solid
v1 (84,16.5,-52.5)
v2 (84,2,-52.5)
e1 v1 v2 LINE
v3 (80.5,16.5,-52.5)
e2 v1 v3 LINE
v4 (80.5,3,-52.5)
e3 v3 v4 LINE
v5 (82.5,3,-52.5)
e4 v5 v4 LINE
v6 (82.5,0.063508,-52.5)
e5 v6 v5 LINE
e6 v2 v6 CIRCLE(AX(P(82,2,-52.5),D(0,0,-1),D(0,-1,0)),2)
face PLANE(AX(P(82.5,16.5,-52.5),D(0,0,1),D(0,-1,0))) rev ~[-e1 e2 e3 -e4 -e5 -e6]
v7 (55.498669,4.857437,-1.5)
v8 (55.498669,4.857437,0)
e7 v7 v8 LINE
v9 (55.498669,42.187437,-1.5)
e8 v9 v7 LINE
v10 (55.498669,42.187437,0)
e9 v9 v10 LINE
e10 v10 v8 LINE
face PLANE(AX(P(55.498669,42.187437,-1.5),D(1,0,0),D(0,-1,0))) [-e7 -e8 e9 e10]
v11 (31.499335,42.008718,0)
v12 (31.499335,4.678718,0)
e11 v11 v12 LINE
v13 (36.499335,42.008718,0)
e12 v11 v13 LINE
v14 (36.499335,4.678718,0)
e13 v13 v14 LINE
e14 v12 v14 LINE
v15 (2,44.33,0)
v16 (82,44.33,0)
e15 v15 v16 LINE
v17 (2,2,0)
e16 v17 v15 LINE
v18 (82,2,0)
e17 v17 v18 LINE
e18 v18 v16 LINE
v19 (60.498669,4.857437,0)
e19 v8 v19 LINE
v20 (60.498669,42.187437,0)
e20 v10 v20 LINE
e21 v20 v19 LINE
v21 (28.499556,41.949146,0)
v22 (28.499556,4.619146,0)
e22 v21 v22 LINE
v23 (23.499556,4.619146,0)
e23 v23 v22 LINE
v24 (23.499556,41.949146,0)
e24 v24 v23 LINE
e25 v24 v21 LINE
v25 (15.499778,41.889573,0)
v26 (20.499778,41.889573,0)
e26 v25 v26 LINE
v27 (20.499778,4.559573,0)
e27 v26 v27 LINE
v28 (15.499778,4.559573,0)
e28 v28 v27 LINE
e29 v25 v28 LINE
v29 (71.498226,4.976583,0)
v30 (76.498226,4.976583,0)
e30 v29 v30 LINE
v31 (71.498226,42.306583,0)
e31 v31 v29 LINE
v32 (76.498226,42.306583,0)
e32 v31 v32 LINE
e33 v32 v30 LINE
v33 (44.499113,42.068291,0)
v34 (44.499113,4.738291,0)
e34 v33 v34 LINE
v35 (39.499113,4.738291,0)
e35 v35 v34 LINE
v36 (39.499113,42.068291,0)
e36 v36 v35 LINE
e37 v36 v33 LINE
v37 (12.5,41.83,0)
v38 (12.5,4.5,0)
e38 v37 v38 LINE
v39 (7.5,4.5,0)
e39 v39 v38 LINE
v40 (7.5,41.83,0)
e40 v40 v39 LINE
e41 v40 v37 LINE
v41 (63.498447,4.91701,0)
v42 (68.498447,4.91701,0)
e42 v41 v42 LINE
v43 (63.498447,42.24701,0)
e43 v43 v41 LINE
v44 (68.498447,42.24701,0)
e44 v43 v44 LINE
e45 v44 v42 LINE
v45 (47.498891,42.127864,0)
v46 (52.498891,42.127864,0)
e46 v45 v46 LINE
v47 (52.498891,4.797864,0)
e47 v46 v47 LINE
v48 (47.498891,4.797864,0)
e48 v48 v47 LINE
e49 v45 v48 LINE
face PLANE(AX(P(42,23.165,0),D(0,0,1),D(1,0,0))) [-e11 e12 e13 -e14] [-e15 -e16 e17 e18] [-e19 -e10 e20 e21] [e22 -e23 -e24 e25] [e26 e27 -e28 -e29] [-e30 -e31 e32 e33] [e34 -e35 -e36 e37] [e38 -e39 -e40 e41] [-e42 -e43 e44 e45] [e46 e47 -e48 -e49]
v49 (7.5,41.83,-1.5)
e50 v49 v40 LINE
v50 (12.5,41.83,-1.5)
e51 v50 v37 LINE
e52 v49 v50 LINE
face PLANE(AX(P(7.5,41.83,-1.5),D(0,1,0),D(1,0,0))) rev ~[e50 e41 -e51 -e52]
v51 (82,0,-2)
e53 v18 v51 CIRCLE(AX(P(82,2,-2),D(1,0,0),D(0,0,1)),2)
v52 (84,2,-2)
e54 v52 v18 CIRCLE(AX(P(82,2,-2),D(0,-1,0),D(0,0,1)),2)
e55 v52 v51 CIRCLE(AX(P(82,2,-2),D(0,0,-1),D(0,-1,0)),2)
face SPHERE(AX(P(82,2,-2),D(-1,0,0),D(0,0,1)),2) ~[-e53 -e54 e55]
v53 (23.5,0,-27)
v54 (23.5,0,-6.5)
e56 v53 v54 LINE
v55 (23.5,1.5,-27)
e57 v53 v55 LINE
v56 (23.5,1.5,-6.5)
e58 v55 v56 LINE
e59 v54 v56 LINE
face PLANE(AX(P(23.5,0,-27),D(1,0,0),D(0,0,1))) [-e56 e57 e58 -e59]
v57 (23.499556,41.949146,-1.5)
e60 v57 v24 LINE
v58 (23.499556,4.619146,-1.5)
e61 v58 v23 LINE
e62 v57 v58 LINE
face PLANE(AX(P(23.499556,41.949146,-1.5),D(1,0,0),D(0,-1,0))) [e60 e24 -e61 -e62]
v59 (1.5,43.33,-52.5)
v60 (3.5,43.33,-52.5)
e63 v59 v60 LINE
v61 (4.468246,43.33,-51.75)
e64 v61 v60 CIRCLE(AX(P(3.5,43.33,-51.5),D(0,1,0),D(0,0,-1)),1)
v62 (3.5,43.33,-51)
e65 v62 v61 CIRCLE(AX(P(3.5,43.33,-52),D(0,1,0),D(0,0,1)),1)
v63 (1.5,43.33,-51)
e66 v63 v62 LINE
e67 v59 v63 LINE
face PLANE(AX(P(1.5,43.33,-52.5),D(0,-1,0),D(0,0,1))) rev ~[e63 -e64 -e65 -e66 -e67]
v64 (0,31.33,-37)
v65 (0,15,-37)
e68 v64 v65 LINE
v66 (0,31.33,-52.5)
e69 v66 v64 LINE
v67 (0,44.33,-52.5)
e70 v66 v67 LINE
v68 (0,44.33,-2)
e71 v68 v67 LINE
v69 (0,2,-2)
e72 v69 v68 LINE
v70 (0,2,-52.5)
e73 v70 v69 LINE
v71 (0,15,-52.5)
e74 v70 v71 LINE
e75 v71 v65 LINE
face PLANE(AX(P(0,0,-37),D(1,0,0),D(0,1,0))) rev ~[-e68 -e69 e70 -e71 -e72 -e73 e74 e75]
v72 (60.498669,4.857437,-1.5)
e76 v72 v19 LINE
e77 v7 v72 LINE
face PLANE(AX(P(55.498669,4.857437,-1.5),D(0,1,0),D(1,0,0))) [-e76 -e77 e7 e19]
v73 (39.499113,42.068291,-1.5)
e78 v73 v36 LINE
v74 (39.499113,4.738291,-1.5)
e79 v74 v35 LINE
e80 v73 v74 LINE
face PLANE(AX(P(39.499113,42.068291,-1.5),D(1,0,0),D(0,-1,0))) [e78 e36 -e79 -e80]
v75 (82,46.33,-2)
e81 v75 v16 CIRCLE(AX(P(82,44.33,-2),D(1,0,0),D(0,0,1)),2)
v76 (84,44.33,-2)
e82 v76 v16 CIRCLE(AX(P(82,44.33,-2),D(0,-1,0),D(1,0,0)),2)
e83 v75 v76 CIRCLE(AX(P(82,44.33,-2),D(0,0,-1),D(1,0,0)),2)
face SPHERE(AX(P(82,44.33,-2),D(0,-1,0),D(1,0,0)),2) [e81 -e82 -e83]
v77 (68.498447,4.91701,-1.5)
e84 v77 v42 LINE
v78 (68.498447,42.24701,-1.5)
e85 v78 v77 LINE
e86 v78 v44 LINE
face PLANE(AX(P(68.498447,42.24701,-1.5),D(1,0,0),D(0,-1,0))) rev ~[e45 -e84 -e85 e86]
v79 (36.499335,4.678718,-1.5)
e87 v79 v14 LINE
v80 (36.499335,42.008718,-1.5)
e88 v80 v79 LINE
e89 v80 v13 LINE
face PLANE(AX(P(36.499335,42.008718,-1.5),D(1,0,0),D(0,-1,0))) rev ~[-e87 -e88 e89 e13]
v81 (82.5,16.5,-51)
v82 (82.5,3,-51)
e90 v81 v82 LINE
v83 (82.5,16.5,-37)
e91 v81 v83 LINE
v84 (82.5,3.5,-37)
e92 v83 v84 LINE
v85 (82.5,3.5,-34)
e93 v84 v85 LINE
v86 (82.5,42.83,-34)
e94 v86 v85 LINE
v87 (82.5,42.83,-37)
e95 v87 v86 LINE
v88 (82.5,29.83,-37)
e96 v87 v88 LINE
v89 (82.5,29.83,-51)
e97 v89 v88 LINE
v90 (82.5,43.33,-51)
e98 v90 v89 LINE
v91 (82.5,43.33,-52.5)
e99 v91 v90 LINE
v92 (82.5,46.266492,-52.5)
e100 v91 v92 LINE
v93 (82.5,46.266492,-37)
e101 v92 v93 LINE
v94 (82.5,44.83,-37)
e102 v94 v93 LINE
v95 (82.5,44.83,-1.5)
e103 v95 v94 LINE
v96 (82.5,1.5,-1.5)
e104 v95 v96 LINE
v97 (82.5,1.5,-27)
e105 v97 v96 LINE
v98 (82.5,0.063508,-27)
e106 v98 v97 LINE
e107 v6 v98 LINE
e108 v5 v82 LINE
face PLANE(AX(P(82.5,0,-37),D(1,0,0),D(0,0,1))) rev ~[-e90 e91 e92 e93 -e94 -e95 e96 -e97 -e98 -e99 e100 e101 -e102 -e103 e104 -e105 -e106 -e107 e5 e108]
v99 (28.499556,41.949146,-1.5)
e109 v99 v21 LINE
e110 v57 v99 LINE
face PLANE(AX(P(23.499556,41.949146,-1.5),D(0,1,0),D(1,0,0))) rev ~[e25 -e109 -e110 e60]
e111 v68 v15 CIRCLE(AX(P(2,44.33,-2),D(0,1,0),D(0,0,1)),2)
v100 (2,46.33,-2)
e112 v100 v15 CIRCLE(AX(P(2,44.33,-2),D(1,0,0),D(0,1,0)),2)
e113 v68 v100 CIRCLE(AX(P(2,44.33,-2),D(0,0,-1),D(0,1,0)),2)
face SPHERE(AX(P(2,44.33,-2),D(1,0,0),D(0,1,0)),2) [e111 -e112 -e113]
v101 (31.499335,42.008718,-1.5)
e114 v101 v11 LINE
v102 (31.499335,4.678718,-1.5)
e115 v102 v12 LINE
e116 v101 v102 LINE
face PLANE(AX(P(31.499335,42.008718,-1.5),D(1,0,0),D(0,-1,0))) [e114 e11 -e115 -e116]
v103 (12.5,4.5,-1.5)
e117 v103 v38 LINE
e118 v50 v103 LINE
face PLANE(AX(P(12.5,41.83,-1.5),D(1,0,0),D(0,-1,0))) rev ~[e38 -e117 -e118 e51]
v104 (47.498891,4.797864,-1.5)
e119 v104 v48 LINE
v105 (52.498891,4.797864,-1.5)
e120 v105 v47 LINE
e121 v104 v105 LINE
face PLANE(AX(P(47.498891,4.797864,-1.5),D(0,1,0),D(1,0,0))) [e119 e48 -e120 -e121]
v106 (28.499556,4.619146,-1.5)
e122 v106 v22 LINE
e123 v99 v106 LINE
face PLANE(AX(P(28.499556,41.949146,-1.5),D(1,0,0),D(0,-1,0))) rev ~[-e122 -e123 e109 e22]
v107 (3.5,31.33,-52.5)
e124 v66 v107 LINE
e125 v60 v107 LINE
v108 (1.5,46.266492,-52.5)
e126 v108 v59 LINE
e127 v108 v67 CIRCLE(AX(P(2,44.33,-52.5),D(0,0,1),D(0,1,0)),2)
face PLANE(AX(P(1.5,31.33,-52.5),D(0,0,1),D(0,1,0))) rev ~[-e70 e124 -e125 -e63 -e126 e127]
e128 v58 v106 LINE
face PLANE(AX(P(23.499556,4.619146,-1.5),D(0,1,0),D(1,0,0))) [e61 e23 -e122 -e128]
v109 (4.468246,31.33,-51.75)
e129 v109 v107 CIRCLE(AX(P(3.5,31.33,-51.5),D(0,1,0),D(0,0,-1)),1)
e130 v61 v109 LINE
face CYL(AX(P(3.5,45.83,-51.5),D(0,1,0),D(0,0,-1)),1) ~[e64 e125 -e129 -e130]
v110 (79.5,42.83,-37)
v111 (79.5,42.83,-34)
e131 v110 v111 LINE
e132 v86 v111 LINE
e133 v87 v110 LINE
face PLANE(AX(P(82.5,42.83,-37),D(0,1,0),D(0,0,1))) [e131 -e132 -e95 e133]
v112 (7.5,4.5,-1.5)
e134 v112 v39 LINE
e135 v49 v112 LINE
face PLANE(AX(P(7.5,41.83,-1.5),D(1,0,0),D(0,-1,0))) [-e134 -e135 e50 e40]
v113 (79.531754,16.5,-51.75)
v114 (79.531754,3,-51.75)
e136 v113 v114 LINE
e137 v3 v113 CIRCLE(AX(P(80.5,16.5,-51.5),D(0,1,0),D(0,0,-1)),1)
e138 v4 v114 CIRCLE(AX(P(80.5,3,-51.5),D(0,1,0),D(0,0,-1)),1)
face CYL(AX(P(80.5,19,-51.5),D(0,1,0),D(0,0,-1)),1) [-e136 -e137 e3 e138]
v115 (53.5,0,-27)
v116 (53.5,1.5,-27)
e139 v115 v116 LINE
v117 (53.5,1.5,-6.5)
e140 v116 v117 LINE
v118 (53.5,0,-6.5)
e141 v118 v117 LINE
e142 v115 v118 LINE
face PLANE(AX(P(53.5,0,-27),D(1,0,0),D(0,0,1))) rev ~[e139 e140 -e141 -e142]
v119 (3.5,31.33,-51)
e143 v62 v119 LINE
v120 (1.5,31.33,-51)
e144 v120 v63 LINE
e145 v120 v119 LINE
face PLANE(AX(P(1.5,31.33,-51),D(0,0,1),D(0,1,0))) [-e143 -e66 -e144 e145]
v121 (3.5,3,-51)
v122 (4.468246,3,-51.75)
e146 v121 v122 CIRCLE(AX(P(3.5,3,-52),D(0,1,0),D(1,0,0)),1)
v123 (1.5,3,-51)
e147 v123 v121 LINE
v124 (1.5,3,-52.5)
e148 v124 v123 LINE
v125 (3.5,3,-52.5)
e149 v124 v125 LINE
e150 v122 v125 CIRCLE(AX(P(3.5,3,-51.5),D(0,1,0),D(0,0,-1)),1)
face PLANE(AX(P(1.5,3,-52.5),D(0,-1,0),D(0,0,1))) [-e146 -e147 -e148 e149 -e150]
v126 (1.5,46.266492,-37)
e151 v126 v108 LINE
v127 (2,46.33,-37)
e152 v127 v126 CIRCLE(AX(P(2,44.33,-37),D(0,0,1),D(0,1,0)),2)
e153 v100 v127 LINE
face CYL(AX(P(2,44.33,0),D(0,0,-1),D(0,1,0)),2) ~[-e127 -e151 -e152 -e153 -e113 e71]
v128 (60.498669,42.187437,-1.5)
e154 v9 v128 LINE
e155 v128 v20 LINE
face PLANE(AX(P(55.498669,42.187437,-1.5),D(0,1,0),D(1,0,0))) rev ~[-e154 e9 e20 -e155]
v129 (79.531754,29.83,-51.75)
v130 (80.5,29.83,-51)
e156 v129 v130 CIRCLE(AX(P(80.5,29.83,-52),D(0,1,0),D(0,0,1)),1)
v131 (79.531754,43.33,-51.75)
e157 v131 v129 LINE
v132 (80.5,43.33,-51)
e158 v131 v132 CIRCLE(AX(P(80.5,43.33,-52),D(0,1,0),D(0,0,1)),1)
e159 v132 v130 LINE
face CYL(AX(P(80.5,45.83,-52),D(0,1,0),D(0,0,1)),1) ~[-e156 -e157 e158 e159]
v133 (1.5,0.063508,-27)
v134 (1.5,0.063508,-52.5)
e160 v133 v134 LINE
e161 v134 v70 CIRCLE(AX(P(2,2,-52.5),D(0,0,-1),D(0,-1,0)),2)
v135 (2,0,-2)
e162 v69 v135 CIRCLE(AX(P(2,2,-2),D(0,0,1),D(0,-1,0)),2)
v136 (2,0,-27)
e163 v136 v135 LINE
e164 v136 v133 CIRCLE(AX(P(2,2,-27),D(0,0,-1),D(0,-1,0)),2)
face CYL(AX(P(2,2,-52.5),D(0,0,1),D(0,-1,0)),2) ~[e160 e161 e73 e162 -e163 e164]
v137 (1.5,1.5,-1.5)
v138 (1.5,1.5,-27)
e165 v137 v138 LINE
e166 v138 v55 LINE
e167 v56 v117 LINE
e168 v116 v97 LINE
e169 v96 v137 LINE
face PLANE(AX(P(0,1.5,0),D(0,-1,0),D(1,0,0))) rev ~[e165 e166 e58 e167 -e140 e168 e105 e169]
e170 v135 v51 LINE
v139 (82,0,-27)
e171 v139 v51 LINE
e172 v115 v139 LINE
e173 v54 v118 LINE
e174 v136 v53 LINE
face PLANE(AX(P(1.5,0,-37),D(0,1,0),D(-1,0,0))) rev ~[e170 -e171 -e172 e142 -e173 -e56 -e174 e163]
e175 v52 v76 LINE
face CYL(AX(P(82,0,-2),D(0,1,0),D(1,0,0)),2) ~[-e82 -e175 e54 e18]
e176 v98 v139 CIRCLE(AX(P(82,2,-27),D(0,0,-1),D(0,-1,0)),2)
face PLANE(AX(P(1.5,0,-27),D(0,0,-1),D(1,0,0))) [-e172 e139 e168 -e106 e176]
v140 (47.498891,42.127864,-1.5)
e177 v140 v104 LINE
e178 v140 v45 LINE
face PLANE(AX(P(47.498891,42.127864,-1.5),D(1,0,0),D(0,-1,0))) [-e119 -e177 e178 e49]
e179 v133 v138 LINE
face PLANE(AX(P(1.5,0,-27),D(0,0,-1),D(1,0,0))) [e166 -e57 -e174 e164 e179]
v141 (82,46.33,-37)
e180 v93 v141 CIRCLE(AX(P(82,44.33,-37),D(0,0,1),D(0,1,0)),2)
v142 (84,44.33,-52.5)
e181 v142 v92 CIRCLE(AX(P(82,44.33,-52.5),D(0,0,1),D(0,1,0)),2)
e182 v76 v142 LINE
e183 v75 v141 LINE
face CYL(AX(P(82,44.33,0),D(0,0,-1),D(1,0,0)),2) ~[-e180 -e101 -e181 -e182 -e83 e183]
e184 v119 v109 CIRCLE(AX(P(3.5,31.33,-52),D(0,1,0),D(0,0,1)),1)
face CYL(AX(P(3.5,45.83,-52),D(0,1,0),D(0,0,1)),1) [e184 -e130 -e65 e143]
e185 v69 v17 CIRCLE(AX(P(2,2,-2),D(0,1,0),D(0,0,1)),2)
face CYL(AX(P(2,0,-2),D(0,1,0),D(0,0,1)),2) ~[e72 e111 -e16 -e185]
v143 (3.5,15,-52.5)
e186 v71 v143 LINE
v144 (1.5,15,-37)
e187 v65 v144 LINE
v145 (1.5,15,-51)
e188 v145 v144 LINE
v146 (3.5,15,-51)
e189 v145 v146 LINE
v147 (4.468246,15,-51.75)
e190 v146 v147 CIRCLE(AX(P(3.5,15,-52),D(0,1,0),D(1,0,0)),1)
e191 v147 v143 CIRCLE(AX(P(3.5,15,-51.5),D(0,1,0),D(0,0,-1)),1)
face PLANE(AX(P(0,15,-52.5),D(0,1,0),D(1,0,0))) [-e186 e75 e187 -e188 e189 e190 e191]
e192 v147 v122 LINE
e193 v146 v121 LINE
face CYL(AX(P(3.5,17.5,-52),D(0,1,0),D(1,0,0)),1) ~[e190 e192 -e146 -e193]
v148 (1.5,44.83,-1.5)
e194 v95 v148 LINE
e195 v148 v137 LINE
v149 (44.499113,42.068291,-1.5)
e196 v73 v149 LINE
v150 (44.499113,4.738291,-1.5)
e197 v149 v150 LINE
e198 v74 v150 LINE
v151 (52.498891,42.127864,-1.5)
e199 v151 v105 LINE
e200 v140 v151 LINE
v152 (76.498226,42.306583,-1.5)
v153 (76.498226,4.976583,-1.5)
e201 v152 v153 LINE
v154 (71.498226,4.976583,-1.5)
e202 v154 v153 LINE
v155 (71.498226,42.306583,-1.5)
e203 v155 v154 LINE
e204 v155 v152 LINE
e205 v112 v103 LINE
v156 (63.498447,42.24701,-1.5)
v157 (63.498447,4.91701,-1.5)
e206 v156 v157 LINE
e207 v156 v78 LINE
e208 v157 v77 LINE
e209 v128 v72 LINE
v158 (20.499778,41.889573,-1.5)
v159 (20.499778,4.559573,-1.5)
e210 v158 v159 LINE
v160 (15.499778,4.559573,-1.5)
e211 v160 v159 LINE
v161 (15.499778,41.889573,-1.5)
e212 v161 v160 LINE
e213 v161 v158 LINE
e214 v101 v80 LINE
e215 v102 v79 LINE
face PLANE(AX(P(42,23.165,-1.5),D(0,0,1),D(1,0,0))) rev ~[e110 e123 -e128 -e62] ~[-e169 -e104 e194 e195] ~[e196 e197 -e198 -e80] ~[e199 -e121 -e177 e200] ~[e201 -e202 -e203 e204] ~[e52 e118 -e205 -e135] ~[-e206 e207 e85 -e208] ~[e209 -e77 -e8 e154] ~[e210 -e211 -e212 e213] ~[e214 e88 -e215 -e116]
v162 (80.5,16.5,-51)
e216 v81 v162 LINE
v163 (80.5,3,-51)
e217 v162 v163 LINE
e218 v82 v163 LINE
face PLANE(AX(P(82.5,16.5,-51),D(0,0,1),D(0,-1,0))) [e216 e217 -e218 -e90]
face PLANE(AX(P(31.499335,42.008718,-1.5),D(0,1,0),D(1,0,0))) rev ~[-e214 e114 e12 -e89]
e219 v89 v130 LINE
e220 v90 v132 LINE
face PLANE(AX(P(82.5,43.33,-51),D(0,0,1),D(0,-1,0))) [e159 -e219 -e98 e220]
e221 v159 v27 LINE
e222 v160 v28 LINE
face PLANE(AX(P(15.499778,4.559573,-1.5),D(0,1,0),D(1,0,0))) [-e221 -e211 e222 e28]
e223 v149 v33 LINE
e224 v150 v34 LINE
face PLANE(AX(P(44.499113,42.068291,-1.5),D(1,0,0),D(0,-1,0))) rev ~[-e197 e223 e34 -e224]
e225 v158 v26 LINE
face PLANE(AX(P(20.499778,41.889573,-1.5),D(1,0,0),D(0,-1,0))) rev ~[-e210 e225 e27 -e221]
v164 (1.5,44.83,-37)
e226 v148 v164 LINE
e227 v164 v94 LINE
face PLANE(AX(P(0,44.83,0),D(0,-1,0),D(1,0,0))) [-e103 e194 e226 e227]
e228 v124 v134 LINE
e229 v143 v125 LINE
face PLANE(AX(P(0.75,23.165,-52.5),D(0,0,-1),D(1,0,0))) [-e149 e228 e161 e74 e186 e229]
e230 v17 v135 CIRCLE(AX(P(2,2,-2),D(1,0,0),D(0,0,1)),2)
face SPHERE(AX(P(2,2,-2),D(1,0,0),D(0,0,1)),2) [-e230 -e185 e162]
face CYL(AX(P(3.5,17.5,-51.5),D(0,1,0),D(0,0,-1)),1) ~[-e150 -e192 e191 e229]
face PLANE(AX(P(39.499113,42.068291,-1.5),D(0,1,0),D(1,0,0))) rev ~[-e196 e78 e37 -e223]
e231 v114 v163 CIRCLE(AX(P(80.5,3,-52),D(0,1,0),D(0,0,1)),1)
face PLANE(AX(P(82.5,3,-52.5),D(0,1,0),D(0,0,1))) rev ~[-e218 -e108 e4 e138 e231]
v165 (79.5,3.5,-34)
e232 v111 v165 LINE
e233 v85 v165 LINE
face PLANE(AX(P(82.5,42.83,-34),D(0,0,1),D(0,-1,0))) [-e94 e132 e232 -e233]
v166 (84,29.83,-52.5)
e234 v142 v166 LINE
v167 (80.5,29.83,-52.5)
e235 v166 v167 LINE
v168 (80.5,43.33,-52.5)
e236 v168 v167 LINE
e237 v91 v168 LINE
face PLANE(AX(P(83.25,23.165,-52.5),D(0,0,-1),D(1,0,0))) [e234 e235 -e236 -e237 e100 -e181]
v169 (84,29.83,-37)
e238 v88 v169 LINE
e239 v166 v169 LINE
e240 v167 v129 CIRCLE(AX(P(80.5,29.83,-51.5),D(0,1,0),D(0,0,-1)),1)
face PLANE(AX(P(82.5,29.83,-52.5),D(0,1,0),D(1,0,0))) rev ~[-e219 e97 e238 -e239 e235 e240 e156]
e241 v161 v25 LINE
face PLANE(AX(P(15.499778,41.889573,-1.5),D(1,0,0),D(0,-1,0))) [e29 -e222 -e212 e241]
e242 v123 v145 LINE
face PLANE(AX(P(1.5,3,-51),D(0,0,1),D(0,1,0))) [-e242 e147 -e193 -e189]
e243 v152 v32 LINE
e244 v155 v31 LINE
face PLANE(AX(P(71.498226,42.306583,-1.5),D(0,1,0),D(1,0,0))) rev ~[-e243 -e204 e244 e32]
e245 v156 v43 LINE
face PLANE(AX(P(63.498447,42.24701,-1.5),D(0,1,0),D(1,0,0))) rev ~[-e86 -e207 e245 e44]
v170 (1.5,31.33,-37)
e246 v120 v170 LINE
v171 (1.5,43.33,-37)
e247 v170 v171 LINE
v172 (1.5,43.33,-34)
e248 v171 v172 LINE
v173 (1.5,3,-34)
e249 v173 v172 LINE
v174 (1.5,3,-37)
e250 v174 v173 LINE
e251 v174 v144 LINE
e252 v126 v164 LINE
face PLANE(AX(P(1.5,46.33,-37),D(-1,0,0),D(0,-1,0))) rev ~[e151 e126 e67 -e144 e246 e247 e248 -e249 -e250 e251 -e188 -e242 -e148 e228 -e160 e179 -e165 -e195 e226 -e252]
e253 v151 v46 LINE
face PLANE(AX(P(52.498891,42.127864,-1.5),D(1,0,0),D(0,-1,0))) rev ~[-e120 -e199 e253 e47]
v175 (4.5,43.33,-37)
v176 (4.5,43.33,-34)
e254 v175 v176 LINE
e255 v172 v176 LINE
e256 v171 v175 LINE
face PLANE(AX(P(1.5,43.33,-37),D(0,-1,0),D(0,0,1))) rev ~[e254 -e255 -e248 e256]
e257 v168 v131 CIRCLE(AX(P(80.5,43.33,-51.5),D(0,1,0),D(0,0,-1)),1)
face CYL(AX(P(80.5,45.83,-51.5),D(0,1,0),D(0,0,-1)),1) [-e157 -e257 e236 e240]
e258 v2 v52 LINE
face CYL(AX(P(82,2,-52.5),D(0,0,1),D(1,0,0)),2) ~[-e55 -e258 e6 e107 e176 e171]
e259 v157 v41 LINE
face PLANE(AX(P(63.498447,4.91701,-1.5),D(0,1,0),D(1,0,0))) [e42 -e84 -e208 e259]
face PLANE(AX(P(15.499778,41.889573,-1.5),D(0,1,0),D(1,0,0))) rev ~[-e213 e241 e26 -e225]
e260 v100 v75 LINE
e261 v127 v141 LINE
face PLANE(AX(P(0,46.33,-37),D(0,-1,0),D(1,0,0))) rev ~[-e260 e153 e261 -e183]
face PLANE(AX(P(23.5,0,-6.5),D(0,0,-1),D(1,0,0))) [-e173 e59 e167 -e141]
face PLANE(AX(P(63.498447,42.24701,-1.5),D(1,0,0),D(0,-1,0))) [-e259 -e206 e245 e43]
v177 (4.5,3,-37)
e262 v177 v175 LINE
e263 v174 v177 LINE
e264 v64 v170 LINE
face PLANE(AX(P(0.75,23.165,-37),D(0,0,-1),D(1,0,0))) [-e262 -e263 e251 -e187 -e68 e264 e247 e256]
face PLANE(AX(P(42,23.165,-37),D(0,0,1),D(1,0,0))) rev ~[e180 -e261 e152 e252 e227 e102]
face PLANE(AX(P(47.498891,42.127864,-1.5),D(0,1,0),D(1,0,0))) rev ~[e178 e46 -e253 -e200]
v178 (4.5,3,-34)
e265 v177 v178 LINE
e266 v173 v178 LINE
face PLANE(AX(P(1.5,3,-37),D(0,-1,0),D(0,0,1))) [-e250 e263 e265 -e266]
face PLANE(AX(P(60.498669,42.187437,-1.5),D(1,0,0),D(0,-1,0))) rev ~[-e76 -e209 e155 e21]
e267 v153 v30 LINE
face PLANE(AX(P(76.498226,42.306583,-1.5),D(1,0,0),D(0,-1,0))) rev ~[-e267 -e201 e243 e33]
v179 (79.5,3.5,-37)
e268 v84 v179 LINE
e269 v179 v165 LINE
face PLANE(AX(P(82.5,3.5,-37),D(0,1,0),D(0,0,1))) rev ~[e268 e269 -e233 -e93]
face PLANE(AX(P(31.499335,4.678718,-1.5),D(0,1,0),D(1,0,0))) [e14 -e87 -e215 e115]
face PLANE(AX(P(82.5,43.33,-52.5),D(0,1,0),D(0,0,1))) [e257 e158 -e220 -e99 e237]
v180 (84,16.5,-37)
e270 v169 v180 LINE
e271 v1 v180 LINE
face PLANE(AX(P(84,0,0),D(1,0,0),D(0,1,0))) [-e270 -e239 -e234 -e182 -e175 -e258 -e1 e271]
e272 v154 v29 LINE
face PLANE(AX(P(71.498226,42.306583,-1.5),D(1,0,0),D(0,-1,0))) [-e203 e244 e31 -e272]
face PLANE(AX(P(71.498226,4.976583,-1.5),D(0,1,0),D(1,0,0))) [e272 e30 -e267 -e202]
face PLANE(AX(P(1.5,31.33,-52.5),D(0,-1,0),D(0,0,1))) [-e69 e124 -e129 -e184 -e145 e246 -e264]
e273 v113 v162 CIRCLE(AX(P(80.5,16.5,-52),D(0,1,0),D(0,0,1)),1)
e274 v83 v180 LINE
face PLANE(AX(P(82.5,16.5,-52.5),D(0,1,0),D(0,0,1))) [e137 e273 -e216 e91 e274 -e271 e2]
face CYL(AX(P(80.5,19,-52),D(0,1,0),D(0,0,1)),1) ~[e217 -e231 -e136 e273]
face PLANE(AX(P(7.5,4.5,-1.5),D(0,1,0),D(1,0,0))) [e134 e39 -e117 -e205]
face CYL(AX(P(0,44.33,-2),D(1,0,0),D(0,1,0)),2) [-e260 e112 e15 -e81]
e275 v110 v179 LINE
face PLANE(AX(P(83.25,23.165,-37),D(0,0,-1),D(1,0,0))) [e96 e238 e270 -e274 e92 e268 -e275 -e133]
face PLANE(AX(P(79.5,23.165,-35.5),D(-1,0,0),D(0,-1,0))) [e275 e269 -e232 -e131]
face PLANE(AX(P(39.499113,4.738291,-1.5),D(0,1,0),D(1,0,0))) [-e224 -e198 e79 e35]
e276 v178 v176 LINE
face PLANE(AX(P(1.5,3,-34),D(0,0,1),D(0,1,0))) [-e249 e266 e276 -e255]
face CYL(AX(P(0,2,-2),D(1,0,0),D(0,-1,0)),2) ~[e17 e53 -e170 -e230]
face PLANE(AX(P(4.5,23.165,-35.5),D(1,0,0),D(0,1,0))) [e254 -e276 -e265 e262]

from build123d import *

# Parameters (mm, degrees)
F0_W         = 84
F0_H         = 46.33
F1_DEPTH     = 37
F2_T         = -1.5
F4_W         = 81
F4_H         = 10
F5_DEPTH     = 1.5
F6_W         = 30
F6_H         = 20.5
F7_DEPTH     = 1.5
F9_DEPTH     = 15.5
F10_W        = 40.33
F10_H        = 3
F11_DEPTH    = 3
F12_W        = 39.33
F12_H        = 3
F13_DEPTH    = 3
F14_W        = 1.5
F14_H        = 13.33
F15_DEPTH    = 15.5
F16_W        = 1.5
F16_H        = 16.33
F17_DEPTH    = 15.5
F18_W        = 12
F18_H        = 1.5
F19_DEPTH    = 3
F20_W        = 13.5
F20_H        = 1.5
F21_DEPTH    = 3
F22_W        = 5
F22_H        = 37.33
F23_DEPTH    = 1.5
F24_R        = 2
F25_T1_DEPTH = 17
F25_T3_DEPTH = 17
F25_T5_DEPTH = 18.5
F25_T7_DEPTH = 18.5


# Not quite as in the source:
# - a fillet or chamfer that OpenCascade refuses, or shapes differently, is made with other operations: its cross-section is extruded or revolved along the edge and cut away or added


with BuildPart() as f1:
    # F0 (on Top) → F1 (new body)
    with BuildSketch(Plane.XY):
        with Locations((42, 23.165)):
            Rectangle(F0_W, F0_H)
    extrude(amount=-F1_DEPTH)

    # F2
    f2_openings = [f1.faces().sort_by_distance(p)[0] for p in [
        (42, 23.165, -37),
    ]]
    offset(amount=F2_T, openings=f2_openings)

    # F4 (on face) → F5 (cut, through all)
    with BuildSketch(Plane.XZ):
        with Locations((42, -32)):
            Rectangle(F4_W, F4_H)
    extrude(amount=-F5_DEPTH, mode=Mode.SUBTRACT)

    # F6 (on face) → F7 (cut, through all)
    with BuildSketch(Plane.XZ):
        with Locations((38.5, -16.75)):
            Rectangle(F6_W, F6_H)
    extrude(amount=-F7_DEPTH, mode=Mode.SUBTRACT)

    # F8 (on face) → F9 (join)
    with BuildSketch(Plane(origin=(0, 0, -37), x_dir=(1, 0, 0), z_dir=(0, 0, -1))):
        Polygon((0, 0), (0, -46.33), (1.5, -46.33), (1.5, -44.83), (1.5, 0), align=None)
        Polygon((82.5, -44.83), (82.5, -46.33), (84, -46.33), (84, 0), (82.5, 0), align=None)
    extrude(amount=F9_DEPTH)

    # F10 (on face) → F11 (join)
    with BuildSketch(Plane.YZ.offset(1.5)):
        with Locations((23.165, -35.5)):
            Rectangle(F10_W, F10_H)
    extrude(amount=F11_DEPTH)

    # F12 (on face) → F13 (join)
    with BuildSketch(Plane(origin=(82.5, 0, 0), x_dir=(0, -1, 0), z_dir=(-1, 0, 0))):
        with Locations((-23.165, -35.5)):
            Rectangle(F12_W, F12_H)
    extrude(amount=F13_DEPTH)

    # F14 (on face) → F15 (cut)
    with BuildSketch(Plane(origin=(0, 0, -52.5), x_dir=(1, 0, 0), z_dir=(0, 0, -1))):
        with Locations((83.25, -23.165)):
            Rectangle(F14_W, F14_H)
    extrude(amount=-F15_DEPTH, mode=Mode.SUBTRACT)

    # F16 (on face) → F17 (cut)
    with BuildSketch(Plane(origin=(0, 0, -52.5), x_dir=(1, 0, 0), z_dir=(0, 0, -1))):
        with Locations((0.75, -23.165)):
            Rectangle(F16_W, F16_H)
    extrude(amount=-F17_DEPTH, mode=Mode.SUBTRACT)

    # F18 (on face) → F19 (join)
    with BuildSketch(Plane.YZ.offset(1.5)):
        with Locations((37.33, -51.75)):
            Rectangle(F18_W, F18_H)
        with Locations((9, -51.75)):
            Rectangle(F18_W, F18_H)
    extrude(amount=F19_DEPTH)

    # F20 (on face) → F21 (join)
    with BuildSketch(Plane(origin=(82.5, 0, 0), x_dir=(0, -1, 0), z_dir=(-1, 0, 0))):
        with Locations((-9.75, -51.75)):
            Rectangle(F20_W, F20_H)
        with Locations((-36.58, -51.75)):
            Rectangle(F20_W, F20_H)
    extrude(amount=F21_DEPTH)

    # F22 (on face) → F23 (cut, through all)
    with BuildSketch(Plane(origin=(0, 0, -1.5), x_dir=(1, 0, 0), z_dir=(0, 0, -1))):
        with Locations((73.9982255152, -23.6415825304)):
            Rectangle(F22_W, F22_H)
        with Locations((65.9984473258, -23.5820097141)):
            Rectangle(F22_W, F22_H)
        with Locations((49.998890947, -23.4628640815)):
            Rectangle(F22_W, F22_H)
        with Locations((41.9991127576, -23.4032912652)):
            Rectangle(F22_W, F22_H)
        with Locations((33.9993345682, -23.3437184489)):
            Rectangle(F22_W, F22_H)
        with Locations((25.9995563788, -23.2841456326)):
            Rectangle(F22_W, F22_H)
        with Locations((17.9997781894, -23.2245728163)):
            Rectangle(F22_W, F22_H)
        with Locations((10, -23.165)):
            Rectangle(F22_W, F22_H)
        with Locations((57.9986691364, -23.5224368978)):
            Rectangle(F22_W, F22_H)
    extrude(amount=-F23_DEPTH, mode=Mode.SUBTRACT)

    # F24
    f24_edges = [f1.edges().sort_by_distance(p)[0] for p in [
        (42, 0, 0),
        (84, 23.165, 0),
        (84, 0, -26.25),
        (84, 46.33, -26.25),
        (42, 46.33, 0),
        (0, 46.33, -26.25),
        (0, 23.165, 0),
        (0, 0, -26.25),
    ]]
    fillet(f24_edges, radius=F24_R)

    # F25: fillet of radius 1 on 8 edges, made by hand

    # F25_s2 → F25_t1 (cut)
    with BuildSketch(Plane.XZ.offset(-17.5)):
        with BuildLine():
            ThreePointArc((3.5, -52.5), (4.2071067812, -52.2071067812), (4.5, -51.5))
            Line((4.5, -51.5), (4.5, -52.5))
            Line((4.5, -52.5), (3.5, -52.5))
        make_face()
        with BuildLine():
            ThreePointArc((4.5, -52), (4.2071067812, -51.2928932188), (3.5, -51))
            Line((3.5, -51), (4.5, -51))
            Line((4.5, -51), (4.5, -52))
        make_face()
    extrude(amount=F25_T1_DEPTH, mode=Mode.SUBTRACT)

    # F25_s4 → F25_t3 (cut)
    with BuildSketch(Plane.XZ.offset(-45.83)):
        with BuildLine():
            ThreePointArc((3.5, -52.5), (4.2071067812, -52.2071067812), (4.5, -51.5))
            Line((4.5, -51.5), (4.5, -52.5))
            Line((4.5, -52.5), (3.5, -52.5))
        make_face()
        with BuildLine():
            ThreePointArc((3.5, -51), (4.2071067812, -51.2928932188), (4.5, -52))
            Line((4.5, -52), (4.5, -51))
            Line((4.5, -51), (3.5, -51))
        make_face()
    extrude(amount=F25_T3_DEPTH, mode=Mode.SUBTRACT)

    # F25_s6 → F25_t5 (cut)
    with BuildSketch(Plane.XZ.offset(-19)):
        with BuildLine():
            ThreePointArc((80.5, -51), (79.7928932188, -51.2928932188), (79.5, -52))
            Line((79.5, -52), (79.5, -51))
            Line((79.5, -51), (80.5, -51))
        make_face()
        with BuildLine():
            ThreePointArc((80.5, -52.5), (79.7928932188, -52.2071067812), (79.5, -51.5))
            Line((79.5, -51.5), (79.5, -52.5))
            Line((79.5, -52.5), (80.5, -52.5))
        make_face()
    extrude(amount=F25_T5_DEPTH, mode=Mode.SUBTRACT)

    # F25_s8 → F25_t7 (cut)
    with BuildSketch(Plane.XZ.offset(-45.83)):
        with BuildLine():
            ThreePointArc((80.5, -52.5), (79.7928932188, -52.2071067812), (79.5, -51.5))
            Line((79.5, -51.5), (79.5, -52.5))
            Line((79.5, -52.5), (80.5, -52.5))
        make_face()
        with BuildLine():
            ThreePointArc((80.5, -51), (79.7928932188, -51.2928932188), (79.5, -52))
            Line((79.5, -52), (79.5, -51))
            Line((79.5, -51), (80.5, -51))
        make_face()
    extrude(amount=F25_T7_DEPTH, mode=Mode.SUBTRACT)


solid = f1.part
